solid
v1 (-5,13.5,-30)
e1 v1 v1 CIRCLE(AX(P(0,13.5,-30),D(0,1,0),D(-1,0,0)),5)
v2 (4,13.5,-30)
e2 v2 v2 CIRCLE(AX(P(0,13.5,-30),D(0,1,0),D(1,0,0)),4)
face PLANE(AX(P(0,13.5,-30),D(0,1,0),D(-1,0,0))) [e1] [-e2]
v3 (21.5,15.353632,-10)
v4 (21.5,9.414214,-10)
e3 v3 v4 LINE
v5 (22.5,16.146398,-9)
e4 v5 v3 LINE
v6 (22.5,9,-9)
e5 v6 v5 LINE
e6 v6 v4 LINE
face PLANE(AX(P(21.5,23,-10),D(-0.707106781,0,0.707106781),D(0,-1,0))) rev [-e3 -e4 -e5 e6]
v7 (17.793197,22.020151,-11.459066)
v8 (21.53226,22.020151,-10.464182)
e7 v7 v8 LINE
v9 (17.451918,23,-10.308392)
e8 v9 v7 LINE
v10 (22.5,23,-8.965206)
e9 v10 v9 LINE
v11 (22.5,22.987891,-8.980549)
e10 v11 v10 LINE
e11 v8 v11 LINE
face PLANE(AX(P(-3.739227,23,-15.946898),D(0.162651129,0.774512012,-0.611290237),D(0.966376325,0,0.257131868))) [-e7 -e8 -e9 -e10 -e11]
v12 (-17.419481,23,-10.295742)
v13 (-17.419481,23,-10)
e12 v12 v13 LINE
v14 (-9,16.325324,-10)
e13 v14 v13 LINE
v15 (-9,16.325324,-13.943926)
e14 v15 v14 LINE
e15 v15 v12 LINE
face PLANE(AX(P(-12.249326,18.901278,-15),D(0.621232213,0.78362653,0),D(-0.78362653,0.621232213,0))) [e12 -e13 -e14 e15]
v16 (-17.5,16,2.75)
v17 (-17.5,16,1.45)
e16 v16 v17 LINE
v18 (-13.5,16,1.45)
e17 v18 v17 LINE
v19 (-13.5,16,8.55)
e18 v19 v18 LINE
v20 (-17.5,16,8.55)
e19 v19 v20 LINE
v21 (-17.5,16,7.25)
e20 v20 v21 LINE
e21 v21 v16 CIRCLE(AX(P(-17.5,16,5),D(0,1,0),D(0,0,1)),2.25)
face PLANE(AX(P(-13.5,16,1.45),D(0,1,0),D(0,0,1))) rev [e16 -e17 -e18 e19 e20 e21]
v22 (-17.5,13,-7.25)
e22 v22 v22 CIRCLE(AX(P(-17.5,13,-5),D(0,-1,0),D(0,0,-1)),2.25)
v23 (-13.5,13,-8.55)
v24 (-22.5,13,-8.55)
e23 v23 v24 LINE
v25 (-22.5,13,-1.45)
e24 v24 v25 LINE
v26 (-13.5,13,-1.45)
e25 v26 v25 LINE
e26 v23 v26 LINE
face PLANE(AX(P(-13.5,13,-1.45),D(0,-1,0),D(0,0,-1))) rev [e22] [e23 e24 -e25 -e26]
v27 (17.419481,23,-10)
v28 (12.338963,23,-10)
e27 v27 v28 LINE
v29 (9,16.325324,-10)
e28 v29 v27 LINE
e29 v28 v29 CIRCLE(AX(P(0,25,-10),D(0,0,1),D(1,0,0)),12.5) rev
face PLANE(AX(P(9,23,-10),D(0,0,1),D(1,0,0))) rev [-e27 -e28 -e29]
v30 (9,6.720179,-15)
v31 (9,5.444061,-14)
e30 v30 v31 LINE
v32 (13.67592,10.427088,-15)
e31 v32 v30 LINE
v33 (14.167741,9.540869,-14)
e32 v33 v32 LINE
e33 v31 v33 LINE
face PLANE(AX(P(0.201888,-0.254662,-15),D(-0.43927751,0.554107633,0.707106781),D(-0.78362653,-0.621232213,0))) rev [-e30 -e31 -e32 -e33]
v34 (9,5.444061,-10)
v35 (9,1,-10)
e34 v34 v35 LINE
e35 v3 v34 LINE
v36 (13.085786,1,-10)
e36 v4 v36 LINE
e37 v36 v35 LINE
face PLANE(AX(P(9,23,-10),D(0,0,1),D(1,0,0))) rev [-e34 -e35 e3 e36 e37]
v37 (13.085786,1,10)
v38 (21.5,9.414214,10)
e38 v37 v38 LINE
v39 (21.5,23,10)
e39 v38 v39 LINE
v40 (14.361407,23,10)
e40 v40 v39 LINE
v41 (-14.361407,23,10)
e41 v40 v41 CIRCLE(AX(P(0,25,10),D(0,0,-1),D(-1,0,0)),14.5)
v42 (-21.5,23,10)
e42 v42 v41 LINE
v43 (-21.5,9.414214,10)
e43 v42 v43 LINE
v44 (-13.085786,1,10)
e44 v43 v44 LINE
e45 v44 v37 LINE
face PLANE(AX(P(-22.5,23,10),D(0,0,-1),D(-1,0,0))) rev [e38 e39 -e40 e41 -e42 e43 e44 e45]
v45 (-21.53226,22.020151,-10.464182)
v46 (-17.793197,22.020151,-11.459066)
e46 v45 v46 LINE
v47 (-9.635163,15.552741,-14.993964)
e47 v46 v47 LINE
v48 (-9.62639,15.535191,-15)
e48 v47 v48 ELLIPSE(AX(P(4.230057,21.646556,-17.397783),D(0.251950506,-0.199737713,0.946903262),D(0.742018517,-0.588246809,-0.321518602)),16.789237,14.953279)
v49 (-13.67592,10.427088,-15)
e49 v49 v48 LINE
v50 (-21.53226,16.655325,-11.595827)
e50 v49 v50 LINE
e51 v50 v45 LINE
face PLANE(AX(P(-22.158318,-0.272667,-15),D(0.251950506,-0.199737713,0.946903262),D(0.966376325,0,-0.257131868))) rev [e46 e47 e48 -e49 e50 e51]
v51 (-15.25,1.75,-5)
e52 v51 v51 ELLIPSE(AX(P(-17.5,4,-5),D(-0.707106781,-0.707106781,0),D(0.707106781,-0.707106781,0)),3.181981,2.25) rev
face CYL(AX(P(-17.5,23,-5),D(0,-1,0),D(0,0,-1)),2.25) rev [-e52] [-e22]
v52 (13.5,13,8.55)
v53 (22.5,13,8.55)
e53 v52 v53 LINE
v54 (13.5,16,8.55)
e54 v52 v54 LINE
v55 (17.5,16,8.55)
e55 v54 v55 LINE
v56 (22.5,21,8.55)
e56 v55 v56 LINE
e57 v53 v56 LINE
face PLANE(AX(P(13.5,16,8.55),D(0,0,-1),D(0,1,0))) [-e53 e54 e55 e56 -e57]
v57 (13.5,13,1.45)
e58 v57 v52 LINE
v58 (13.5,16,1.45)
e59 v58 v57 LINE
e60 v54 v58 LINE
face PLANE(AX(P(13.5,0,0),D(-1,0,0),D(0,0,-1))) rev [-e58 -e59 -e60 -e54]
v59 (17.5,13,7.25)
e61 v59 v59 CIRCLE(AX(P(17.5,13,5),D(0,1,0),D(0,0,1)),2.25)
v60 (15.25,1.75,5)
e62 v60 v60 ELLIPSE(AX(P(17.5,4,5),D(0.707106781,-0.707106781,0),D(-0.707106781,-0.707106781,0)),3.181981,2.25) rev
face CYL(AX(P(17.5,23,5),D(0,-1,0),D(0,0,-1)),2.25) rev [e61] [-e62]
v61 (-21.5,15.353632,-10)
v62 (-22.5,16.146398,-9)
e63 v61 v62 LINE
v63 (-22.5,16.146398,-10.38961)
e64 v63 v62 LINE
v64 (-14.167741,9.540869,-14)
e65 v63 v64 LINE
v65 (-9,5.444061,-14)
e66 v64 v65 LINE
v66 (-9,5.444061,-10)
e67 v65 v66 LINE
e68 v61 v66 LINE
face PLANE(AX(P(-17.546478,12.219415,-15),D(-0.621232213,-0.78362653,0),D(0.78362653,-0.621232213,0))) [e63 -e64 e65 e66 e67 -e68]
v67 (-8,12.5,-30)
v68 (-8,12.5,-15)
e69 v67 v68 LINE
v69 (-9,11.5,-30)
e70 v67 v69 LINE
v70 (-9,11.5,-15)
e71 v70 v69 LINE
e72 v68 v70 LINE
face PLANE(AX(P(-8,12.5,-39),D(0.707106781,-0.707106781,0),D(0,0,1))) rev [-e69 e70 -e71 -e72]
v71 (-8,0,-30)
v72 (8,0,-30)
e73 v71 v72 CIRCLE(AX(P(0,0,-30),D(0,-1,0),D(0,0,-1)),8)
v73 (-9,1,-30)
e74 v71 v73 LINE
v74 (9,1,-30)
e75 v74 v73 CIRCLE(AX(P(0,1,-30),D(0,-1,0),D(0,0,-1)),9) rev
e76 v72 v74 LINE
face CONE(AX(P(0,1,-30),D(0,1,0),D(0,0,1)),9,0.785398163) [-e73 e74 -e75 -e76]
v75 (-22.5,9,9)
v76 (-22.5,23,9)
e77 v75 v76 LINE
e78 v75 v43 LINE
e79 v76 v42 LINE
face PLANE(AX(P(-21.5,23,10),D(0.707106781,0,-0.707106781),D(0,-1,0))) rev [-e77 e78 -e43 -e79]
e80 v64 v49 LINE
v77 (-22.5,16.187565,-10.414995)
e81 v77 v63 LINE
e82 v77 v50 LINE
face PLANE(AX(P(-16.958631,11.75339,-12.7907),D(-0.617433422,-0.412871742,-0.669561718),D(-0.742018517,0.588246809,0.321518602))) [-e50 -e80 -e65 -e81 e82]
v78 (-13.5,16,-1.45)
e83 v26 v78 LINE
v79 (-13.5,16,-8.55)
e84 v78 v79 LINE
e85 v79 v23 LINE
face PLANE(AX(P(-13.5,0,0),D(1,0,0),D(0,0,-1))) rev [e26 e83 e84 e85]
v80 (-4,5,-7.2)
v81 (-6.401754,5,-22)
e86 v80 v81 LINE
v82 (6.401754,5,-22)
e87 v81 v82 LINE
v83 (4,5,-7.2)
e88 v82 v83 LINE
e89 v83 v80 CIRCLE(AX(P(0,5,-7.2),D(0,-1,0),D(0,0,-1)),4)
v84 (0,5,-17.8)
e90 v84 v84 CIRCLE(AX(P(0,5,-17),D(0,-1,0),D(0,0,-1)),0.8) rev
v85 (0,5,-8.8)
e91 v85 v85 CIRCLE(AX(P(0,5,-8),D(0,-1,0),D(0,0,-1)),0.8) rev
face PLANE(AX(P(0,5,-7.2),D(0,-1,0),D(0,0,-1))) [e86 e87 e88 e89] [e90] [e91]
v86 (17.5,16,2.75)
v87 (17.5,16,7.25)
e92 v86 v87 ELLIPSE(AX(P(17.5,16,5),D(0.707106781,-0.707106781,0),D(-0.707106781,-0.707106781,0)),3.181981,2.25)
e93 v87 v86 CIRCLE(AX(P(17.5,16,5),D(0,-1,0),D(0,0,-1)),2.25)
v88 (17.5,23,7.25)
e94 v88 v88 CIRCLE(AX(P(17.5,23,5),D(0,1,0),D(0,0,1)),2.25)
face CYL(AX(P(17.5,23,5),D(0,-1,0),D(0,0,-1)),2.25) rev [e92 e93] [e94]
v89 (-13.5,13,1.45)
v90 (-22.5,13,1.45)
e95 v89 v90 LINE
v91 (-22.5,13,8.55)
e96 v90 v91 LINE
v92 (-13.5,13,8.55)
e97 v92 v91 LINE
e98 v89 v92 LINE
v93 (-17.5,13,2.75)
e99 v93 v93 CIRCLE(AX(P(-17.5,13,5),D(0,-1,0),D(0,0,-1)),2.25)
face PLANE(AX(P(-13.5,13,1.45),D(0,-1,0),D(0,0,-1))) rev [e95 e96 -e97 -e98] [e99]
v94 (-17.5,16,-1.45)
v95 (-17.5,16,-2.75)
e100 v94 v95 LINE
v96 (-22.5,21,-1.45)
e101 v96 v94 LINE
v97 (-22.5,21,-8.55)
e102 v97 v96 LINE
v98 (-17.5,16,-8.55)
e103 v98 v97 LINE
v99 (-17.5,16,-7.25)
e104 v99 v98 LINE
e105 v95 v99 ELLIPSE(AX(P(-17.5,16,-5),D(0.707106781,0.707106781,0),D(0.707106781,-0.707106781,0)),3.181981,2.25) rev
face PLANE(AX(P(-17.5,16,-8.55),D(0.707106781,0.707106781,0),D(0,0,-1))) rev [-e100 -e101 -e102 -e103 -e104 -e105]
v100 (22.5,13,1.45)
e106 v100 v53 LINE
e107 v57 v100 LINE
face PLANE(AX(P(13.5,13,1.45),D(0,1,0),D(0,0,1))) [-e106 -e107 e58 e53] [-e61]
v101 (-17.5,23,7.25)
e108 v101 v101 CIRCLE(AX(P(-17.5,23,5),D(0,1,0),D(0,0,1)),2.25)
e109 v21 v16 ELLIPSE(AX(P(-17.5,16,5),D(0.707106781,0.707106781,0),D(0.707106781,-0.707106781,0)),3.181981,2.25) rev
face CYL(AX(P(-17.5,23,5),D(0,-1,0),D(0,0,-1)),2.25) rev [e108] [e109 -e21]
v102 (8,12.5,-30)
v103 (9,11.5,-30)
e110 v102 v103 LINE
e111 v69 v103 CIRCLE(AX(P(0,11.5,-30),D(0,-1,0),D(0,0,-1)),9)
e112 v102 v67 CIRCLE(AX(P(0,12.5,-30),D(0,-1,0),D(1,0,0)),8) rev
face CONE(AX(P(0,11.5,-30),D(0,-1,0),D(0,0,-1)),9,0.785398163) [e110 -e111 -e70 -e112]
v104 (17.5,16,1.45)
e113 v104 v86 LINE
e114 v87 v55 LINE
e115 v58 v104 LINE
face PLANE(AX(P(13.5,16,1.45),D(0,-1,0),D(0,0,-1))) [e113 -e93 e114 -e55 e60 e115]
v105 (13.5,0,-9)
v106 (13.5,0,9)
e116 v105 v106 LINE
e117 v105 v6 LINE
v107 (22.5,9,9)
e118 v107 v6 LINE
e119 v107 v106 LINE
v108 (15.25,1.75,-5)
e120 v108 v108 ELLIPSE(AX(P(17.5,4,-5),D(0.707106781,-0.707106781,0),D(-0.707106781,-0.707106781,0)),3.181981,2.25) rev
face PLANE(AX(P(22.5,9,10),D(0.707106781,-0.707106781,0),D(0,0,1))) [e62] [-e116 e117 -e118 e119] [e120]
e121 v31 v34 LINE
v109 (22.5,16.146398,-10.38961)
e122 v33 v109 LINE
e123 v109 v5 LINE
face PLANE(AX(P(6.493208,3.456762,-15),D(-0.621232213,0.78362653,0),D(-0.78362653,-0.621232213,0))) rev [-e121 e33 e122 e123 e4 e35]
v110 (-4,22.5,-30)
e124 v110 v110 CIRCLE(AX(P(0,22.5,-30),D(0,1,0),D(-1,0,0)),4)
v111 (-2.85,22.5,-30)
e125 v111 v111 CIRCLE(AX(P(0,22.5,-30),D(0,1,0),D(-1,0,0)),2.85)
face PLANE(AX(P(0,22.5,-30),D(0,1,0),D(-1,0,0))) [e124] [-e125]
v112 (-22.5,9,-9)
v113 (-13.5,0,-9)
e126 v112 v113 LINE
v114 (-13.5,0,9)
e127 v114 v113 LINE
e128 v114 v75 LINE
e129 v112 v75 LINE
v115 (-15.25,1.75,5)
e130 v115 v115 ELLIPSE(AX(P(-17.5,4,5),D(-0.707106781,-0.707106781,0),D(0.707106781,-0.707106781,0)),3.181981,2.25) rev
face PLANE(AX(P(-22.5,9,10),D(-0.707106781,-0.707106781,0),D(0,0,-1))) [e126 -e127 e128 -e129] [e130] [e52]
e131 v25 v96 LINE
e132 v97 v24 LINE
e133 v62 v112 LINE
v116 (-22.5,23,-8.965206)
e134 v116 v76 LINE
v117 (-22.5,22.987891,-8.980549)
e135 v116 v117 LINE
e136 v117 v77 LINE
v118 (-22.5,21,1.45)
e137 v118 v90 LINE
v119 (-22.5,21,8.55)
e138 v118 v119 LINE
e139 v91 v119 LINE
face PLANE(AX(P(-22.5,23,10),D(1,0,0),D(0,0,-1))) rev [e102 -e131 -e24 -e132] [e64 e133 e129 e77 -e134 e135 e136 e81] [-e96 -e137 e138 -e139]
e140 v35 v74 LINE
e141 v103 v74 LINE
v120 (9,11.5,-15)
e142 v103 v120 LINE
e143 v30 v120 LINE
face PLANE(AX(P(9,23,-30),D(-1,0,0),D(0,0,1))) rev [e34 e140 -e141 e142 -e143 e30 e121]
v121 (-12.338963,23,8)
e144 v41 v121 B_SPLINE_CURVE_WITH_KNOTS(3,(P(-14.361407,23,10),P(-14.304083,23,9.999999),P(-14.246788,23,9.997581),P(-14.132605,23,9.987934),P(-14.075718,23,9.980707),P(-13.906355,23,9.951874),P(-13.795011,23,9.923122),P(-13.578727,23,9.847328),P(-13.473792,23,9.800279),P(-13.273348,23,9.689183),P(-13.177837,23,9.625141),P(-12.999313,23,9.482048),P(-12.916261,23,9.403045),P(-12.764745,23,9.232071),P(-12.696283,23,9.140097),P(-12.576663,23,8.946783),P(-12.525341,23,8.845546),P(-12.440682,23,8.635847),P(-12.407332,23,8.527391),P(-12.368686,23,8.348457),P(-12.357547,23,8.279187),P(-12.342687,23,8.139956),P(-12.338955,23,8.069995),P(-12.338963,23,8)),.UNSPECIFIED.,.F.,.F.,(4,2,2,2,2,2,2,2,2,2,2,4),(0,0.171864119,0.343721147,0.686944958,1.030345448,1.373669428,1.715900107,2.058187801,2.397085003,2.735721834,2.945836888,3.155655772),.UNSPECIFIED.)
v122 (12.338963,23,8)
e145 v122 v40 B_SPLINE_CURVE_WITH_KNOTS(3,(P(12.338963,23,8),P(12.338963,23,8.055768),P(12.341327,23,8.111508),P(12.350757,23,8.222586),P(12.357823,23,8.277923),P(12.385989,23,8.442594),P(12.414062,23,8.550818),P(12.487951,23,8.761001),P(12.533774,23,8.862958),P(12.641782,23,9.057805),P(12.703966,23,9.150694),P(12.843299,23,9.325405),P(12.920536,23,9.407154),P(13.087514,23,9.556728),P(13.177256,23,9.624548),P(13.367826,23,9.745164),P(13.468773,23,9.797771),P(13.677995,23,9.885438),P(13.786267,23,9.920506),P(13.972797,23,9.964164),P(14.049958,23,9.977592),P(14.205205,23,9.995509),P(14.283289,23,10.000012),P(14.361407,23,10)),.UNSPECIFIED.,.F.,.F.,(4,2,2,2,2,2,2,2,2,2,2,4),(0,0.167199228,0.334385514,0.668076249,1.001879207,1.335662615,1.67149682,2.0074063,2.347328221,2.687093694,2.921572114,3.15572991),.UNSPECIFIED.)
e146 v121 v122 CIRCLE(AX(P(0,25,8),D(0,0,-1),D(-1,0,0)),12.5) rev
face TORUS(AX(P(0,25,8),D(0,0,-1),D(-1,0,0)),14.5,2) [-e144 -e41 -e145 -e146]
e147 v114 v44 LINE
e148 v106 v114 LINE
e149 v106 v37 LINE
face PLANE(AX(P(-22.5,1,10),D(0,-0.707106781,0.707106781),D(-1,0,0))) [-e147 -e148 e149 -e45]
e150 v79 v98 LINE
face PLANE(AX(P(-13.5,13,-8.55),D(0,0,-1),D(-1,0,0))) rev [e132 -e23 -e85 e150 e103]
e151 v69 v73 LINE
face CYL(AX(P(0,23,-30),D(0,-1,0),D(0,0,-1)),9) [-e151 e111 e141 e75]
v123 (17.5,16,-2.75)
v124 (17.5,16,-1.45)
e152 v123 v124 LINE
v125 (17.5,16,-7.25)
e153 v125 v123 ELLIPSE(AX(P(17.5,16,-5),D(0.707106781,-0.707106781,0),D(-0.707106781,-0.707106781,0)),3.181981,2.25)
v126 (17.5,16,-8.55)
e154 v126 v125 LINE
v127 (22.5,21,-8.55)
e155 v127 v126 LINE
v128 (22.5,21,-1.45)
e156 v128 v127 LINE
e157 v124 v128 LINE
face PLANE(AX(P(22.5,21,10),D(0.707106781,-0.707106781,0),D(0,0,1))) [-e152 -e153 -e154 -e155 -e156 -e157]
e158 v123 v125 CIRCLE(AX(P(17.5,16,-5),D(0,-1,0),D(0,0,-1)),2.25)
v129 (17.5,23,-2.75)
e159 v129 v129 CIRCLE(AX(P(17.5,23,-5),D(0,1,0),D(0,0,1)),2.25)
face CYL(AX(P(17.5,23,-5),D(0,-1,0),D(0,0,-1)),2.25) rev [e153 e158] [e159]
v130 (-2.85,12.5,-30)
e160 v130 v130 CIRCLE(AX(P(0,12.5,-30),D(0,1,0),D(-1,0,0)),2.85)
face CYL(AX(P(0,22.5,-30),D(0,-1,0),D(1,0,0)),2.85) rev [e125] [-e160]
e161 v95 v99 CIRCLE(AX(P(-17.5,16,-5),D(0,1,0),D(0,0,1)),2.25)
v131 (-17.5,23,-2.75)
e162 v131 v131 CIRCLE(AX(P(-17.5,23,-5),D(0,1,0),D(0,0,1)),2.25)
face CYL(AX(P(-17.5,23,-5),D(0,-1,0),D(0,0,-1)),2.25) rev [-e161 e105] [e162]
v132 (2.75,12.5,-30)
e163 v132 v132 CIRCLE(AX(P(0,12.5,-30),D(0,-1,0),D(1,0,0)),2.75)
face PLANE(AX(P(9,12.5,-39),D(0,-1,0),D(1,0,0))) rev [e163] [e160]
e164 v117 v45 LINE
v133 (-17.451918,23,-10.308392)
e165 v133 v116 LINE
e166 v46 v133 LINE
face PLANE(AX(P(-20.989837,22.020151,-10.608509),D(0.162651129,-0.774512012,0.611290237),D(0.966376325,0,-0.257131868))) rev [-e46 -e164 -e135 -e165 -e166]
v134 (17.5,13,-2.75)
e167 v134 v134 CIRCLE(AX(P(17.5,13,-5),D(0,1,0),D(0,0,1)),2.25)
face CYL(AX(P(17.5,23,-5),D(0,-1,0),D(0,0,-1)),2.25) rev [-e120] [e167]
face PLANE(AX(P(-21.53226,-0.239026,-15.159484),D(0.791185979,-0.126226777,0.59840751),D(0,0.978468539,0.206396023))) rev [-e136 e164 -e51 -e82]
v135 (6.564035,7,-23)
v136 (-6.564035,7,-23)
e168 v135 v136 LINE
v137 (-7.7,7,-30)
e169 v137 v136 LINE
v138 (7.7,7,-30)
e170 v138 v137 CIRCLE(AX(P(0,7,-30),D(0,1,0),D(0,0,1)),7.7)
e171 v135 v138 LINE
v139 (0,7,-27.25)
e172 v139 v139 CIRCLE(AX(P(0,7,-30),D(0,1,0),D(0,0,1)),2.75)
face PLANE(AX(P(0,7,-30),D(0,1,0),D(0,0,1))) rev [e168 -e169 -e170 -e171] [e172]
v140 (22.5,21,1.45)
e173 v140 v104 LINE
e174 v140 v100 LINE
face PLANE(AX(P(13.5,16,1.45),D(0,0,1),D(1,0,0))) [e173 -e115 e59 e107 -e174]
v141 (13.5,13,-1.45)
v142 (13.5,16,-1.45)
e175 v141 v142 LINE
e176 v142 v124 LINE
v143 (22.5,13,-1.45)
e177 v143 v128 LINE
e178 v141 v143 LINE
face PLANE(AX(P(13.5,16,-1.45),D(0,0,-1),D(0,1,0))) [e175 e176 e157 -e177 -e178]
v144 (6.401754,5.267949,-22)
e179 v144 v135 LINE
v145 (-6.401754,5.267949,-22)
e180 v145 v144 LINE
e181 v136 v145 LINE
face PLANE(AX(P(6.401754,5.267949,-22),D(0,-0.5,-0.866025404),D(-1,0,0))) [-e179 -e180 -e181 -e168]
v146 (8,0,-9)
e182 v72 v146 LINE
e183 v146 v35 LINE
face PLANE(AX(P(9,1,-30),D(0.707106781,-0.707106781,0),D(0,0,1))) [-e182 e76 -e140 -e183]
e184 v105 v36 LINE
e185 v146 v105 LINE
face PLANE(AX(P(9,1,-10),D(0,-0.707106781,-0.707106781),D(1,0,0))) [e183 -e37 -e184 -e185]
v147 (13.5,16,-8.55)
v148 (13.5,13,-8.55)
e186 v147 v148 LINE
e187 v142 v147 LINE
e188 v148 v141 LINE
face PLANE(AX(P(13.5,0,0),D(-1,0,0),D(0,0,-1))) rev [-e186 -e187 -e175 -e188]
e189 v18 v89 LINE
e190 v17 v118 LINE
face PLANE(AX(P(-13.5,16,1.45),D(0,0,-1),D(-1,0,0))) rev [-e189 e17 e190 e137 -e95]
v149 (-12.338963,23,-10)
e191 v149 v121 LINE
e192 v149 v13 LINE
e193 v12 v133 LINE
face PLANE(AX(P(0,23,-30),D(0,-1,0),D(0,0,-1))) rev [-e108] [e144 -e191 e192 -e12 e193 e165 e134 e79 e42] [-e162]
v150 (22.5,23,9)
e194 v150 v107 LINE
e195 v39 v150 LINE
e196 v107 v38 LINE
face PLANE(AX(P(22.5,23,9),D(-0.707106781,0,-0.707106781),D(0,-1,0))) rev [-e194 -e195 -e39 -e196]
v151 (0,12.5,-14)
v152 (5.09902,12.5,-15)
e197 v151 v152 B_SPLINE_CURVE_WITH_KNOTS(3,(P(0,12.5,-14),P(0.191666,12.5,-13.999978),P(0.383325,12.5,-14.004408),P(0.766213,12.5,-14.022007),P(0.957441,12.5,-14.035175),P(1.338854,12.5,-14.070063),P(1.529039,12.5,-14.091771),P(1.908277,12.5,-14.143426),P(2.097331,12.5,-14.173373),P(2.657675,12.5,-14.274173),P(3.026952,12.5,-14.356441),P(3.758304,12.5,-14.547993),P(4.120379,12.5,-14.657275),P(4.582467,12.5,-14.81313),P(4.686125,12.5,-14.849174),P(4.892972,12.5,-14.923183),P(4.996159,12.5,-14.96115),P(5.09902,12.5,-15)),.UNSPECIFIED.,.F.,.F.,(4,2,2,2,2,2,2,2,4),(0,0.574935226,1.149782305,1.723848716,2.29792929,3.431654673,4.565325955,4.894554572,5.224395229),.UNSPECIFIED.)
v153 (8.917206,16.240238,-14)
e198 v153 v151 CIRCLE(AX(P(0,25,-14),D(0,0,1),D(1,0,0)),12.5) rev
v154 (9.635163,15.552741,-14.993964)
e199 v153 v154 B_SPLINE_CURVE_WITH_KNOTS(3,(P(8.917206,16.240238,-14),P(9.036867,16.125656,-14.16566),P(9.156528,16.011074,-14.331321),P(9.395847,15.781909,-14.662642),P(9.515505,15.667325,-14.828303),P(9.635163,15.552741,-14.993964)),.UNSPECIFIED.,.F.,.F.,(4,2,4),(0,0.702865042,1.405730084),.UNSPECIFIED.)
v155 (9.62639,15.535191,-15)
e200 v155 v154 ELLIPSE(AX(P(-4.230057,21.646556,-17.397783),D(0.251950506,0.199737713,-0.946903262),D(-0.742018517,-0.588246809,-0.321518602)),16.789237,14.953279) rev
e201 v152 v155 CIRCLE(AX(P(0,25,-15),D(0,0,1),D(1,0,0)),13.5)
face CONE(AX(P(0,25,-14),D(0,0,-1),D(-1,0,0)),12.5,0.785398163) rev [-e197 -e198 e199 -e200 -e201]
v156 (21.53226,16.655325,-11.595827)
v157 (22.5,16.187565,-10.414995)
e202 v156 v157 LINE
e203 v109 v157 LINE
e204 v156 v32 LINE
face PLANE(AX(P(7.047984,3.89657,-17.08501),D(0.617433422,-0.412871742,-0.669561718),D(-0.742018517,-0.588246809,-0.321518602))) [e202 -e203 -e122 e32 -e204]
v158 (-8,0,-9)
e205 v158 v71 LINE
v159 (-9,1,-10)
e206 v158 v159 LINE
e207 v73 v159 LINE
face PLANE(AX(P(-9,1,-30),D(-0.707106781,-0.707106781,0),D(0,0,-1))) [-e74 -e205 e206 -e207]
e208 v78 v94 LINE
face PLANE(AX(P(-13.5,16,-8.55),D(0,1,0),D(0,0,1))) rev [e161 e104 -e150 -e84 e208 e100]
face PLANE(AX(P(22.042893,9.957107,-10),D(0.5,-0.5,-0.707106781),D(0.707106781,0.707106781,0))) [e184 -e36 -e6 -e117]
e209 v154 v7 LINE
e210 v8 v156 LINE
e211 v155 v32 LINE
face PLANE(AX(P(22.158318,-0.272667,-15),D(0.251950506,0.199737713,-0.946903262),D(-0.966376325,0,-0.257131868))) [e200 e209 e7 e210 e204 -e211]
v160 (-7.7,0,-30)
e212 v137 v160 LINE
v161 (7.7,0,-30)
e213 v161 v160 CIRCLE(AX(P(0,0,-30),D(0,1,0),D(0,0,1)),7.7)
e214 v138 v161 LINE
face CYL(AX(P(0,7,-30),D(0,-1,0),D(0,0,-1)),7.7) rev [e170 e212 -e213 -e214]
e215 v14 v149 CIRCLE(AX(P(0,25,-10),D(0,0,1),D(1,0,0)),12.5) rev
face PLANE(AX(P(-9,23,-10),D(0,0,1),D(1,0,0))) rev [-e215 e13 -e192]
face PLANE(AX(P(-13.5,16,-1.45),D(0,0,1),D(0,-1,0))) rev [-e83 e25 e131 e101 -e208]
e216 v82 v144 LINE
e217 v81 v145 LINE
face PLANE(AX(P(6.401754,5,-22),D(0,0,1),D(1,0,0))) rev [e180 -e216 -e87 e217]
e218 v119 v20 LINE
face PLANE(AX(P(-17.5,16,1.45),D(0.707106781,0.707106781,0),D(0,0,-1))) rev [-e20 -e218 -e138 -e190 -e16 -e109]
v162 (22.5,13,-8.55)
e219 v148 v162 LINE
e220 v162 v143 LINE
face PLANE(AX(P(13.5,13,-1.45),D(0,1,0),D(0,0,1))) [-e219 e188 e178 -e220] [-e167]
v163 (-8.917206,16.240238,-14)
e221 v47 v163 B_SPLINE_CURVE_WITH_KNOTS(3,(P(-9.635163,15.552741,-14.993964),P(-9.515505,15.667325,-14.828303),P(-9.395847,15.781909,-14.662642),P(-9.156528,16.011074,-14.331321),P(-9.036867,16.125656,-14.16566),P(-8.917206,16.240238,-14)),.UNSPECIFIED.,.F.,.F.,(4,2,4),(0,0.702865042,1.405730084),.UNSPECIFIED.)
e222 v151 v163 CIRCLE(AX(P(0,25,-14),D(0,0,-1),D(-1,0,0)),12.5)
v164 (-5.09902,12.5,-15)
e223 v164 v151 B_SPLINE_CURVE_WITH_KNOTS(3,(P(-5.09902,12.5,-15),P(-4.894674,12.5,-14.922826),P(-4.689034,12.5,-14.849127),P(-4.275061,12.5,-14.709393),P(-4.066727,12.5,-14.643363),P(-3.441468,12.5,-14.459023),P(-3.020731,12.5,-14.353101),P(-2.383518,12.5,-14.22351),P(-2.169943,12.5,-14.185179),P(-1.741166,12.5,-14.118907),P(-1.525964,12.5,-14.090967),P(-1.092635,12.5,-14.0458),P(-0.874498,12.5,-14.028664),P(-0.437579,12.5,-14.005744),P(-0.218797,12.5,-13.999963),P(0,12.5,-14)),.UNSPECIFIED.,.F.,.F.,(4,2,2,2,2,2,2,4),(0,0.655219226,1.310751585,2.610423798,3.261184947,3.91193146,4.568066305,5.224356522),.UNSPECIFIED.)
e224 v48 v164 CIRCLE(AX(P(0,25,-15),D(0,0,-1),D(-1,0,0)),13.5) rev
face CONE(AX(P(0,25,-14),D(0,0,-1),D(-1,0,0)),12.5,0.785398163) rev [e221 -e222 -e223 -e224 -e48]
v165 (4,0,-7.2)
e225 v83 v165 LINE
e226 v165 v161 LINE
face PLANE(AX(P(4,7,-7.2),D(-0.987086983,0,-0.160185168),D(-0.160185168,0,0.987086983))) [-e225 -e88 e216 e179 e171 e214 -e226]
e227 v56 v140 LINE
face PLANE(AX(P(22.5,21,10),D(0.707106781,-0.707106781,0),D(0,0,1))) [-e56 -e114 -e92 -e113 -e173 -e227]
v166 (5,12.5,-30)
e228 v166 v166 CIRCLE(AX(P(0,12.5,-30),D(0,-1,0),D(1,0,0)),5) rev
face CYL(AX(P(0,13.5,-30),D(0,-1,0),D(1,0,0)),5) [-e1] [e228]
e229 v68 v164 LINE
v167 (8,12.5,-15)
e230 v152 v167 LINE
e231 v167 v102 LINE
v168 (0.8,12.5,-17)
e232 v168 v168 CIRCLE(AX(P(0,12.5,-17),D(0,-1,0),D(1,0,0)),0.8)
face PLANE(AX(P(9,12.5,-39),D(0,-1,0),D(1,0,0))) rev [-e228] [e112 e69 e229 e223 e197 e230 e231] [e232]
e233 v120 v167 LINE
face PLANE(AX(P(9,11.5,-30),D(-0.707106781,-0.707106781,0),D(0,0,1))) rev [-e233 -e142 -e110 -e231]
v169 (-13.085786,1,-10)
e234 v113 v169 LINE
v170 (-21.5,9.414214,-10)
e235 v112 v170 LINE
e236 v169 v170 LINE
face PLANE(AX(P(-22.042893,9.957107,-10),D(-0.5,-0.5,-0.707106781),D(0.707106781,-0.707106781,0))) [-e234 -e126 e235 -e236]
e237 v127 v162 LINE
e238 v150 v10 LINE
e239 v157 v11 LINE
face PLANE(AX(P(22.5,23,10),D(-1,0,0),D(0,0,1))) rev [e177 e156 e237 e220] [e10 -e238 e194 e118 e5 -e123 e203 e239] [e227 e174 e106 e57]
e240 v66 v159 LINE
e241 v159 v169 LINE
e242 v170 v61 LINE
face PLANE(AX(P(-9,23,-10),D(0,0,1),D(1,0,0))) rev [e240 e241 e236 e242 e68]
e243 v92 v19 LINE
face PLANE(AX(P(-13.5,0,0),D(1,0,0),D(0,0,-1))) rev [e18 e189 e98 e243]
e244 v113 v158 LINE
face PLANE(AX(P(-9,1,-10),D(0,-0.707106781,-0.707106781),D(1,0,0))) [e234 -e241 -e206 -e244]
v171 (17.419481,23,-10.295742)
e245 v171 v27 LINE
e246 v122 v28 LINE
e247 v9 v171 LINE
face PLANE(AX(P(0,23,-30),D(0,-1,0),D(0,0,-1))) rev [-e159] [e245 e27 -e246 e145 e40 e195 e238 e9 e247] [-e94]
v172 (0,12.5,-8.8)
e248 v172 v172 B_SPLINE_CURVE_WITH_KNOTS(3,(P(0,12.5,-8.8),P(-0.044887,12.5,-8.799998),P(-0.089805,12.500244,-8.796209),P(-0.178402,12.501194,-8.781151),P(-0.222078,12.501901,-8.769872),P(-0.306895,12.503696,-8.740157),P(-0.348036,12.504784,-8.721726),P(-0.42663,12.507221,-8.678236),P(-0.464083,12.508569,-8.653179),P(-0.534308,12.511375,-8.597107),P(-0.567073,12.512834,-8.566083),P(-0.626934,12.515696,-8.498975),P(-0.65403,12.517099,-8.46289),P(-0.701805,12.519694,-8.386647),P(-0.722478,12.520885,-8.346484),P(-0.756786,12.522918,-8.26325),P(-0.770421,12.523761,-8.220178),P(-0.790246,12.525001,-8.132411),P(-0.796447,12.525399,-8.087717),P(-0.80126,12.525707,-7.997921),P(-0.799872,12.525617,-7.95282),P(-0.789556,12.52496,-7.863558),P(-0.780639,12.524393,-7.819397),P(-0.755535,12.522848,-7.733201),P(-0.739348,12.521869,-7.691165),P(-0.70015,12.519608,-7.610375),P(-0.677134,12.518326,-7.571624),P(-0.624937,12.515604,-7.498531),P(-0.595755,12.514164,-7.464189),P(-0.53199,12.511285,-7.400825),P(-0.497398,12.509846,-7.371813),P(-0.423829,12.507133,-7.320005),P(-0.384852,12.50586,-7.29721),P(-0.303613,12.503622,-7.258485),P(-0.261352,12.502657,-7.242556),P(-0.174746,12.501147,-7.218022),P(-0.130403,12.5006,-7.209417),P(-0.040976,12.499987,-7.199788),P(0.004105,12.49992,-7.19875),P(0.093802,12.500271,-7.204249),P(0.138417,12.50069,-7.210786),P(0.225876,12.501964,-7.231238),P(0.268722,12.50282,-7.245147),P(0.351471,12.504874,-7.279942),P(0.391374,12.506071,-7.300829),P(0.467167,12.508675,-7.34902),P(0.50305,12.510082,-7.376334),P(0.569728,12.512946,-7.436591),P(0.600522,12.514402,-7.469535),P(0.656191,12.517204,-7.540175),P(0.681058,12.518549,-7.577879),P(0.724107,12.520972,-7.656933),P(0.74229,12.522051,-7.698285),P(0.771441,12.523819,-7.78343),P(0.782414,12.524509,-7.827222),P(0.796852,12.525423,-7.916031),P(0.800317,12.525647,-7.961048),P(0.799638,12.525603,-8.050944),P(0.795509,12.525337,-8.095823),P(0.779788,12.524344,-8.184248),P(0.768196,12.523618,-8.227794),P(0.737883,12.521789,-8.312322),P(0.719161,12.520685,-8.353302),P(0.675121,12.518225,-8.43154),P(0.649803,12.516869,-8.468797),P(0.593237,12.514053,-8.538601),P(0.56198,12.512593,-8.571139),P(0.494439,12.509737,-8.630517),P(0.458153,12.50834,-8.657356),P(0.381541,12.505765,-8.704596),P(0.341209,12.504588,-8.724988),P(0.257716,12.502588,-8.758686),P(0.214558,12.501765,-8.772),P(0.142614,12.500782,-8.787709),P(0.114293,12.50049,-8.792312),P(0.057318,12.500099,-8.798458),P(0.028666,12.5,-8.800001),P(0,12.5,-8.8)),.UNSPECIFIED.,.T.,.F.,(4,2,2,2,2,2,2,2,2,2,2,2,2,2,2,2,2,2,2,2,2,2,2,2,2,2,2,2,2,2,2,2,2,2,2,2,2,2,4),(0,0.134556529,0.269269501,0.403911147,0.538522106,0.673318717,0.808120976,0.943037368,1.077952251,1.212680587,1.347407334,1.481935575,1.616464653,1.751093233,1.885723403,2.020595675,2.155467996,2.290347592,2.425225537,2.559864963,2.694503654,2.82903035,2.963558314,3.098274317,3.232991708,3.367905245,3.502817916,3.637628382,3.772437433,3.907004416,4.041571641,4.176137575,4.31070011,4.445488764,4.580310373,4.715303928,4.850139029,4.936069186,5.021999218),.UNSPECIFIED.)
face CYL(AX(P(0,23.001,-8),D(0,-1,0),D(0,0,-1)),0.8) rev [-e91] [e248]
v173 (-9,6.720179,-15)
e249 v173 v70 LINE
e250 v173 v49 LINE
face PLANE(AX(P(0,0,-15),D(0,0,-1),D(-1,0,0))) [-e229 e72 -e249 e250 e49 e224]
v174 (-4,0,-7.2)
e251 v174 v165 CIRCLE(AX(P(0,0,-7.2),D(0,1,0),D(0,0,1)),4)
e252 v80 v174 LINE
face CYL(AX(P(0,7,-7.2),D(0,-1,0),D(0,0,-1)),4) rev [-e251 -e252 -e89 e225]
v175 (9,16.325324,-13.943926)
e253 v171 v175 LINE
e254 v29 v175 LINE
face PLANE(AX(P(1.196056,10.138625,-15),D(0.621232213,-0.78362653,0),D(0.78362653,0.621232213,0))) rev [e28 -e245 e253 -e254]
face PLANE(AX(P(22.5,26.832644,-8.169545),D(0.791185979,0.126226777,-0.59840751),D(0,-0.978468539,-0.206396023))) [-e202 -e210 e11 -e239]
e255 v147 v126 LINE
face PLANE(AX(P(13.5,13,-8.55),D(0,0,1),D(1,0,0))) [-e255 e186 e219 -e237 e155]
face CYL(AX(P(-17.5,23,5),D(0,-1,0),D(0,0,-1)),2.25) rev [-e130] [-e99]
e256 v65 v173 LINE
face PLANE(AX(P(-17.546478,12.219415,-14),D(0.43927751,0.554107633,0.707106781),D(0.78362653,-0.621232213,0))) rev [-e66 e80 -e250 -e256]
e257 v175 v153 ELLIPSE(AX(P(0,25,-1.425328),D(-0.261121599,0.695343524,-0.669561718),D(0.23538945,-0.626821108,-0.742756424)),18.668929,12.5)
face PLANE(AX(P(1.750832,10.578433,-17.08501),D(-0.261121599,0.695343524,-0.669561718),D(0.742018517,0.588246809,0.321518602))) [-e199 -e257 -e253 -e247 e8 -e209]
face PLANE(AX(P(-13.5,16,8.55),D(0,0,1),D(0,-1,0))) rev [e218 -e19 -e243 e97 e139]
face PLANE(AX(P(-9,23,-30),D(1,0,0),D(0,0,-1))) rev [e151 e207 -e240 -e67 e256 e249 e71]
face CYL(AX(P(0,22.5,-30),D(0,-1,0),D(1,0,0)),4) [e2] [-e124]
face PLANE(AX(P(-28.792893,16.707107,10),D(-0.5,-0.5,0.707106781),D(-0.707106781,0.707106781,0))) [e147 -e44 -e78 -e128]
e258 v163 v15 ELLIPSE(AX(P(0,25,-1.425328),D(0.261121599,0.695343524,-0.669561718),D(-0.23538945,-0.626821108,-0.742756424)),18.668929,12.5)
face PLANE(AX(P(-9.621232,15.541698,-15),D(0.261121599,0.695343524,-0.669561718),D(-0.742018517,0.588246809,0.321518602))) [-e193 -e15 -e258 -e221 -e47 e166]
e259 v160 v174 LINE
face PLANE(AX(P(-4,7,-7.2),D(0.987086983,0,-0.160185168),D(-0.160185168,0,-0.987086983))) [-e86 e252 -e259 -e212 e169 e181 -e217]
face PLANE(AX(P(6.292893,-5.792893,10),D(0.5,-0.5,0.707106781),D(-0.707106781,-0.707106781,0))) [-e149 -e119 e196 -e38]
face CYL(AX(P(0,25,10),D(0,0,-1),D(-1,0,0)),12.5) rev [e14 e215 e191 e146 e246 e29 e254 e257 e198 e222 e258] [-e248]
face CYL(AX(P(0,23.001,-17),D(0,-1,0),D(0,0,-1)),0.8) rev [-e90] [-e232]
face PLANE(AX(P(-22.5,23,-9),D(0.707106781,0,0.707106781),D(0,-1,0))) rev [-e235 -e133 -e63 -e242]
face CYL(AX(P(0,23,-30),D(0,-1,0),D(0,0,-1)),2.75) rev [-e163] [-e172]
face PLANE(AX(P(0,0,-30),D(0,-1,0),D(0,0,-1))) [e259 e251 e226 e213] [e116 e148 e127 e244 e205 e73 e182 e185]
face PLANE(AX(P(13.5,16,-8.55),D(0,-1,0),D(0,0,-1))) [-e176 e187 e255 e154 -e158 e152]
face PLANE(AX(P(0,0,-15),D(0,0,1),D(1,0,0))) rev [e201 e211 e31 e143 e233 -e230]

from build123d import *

# Parameters (mm, degrees)
SKETCH1_R               = 2.25
SKETCH1_R_2             = 2.75
BOSS_EXTRUDE1_DEPTH     = 23
CUT_EXTRUDE1_DEPTH      = 10
CUT_EXTRUDE1_DEPTH_BACK = 51.55937104
SKETCH2_R               = 12.5
BOSS_EXTRUDE2_START     = -22.5
BOSS_EXTRUDE2_DEPTH     = 5
CUT_EXTRUDE8_REACH      = 52.496
FILLET1_R               = 2
CHAMFER1_SIZE           = 9
CHAMFER2_SIZE           = 1
SKETCH5_R               = 3.35
CUT_EXTRUDE10_DEPTH     = 4
CUT_EXTRUDE11_START     = -15
SKETCH6_W               = 18
SKETCH6_H               = 3.825324214
CUT_EXTRUDE11_DEPTH     = 36.559371208
CHAMFER3_SIZE           = 1
CHAMFER4_SIZE           = 1
CHAMFER5_SIZE           = 1
CHAMFER6_SIZE           = 1
SKETCH7_R               = 4
SKETCH7_R_2             = 2.85
BOSS_EXTRUDE3_DEPTH     = 10
SKETCH8_R               = 5
SKETCH8_R_2             = 4
EXTRUDE_THIN1_DEPTH     = 1
SKETCH10_R              = 0.3
BOSS_EXTRUDE4_DEPTH     = 4
BOSS_EXTRUDE5_START     = 4
SKETCH11_R              = 2.5
SKETCH11_R_2            = 1.6
BOSS_EXTRUDE5_DEPTH     = 2
SKETCH12_W              = 7.1
SKETCH12_H              = 3
CUT_EXTRUDE12_DEPTH     = 9
CHAMFER7_SIZE           = 5
SKETCH13_R              = 1.6
SKETCH13_R_2            = 0.8
CUT_EXTRUDE13_DEPTH     = 7
BOSS_EXTRUDE6_START     = 2
BOSS_EXTRUDE6_DEPTH     = 2
CUT_EXTRUDE14_REACH     = 52.559
SKETCH13_2_R            = 0.8
CHAMFER8_SIZE           = 1
CHAMFER8_SIZE2          = 1.732050808


with BuildPart() as part:
    # Sketch1 → Boss-Extrude1 (new body)
    with BuildSketch(Plane(origin=(0, 0, 0), x_dir=(1, 0, 0), z_dir=(0, 1, 0))):
        with BuildLine():
            Line((-22.5, -10), (-22.5, 10))
            Line((-22.5, 10), (-9, 10))
            Line((-9, 10), (-9, 30))
            ThreePointArc((-9, 30), (0, 39), (9, 30))
            Line((9, 30), (9, 10))
            Line((9, 10), (22.5, 10))
            Line((22.5, 10), (22.5, -10))
            Line((22.5, -10), (-22.5, -10))
        make_face()
        with Locations(Location((-17.5, 5, 0), (0, 0, 270))):
            Circle(SKETCH1_R, mode=Mode.SUBTRACT)
        with Locations(Location((-17.5, -5, 0), (0, 0, 270))):
            Circle(SKETCH1_R, mode=Mode.SUBTRACT)
        with Locations(Location((17.5, 5, 0), (0, 0, 270))):
            Circle(SKETCH1_R, mode=Mode.SUBTRACT)
        with Locations(Location((17.5, -5, 0), (0, 0, 270))):
            Circle(SKETCH1_R, mode=Mode.SUBTRACT)
        with Locations(Location((0, 30, 0), (0, 0, 270))):
            Circle(SKETCH1_R_2, mode=Mode.SUBTRACT)
    extrude(amount=BOSS_EXTRUDE1_DEPTH)

    # Sketch2 → Cut-Extrude1 (cut, two sides: drawn at the far end of the back side and taken through both)
    with BuildSketch(Plane.XY.offset(-CUT_EXTRUDE1_DEPTH_BACK)):
        with Locations((0, 25)):
            Circle(SKETCH2_R)
    extrude(amount=CUT_EXTRUDE1_DEPTH + CUT_EXTRUDE1_DEPTH_BACK, mode=Mode.SUBTRACT)

    # Sketch3 → Boss-Extrude2 (add)
    with BuildSketch(Plane(origin=(0, 0, -32.5), x_dir=(-1, 0, 0), z_dir=(0, 0, -1)).offset(BOSS_EXTRUDE2_START)):
        Polygon((9, 16.325324214), (17.41948134, 23), (22.5, 23), (22.5, 16.146397564), (9, 5.444060985), align=None)
    boss_extrude2 = extrude(amount=BOSS_EXTRUDE2_DEPTH)

    # Mirror1: Boss-Extrude2 across plane
    add(boss_extrude2.mirror(Plane(origin=(0, 0, 0), x_dir=(0, 0, 1), z_dir=(1, 0, 0))))

    # Sketch4 → Cut-Extrude8 (cut, up to next)
    with BuildSketch(Plane(origin=(4.474031923, 5.643574234, 0), x_dir=(0.7836265295847679, -0.6212322127280048, 0), z_dir=(0.6212322127280048, 0.7836265295847679, 0)), mode=Mode.PRIVATE) as cut_extrude8_sk1:
        Polygon((-17.194456051, 15), (-31.919937808, 10), (-31.919937808, 15.796390808), (-17.194456051, 15.796390808), align=None)
    cut_extrude8_tool1 = extrude(cut_extrude8_sk1.sketch, amount=-CUT_EXTRUDE8_REACH, mode=Mode.PRIVATE) & part.part
    cut_extrude8 = cut_extrude8_tool1.solids().sort_by_distance((-16.228214, 22.055604, -13.832193))[0]
    add(cut_extrude8, mode=Mode.SUBTRACT)

    # Mirror2: Cut-Extrude8 across plane
    add(cut_extrude8.mirror(Plane(origin=(0, 0, 0), x_dir=(0, 0, 1), z_dir=(1, 0, 0))), mode=Mode.SUBTRACT)

    # Fillet1
    fillet1_edges = [part.edges().sort_by_distance(p)[0] for p in [
        (0, 12.5, 10),
    ]]
    fillet(fillet1_edges, radius=FILLET1_R)

    # Chamfer1
    # the kernel refuses this chamfer: 9 mm, written as the material it takes off along each edge
    with BuildSketch(Plane(origin=(22.5, 0, -33.145146892), x_dir=(-0.9996219169112966, -0.027495876610586365, 0), z_dir=(0, 0, 1))) as chamfer1_piece_1:
        Polygon((CHAMFER1_SIZE * 0.999621916911, -CHAMFER1_SIZE * 0.0274958766106), (-CHAMFER1_SIZE * 0.0274958766106, -CHAMFER1_SIZE * 0.999621916911), (0, 0), align=None)
    extrude(amount=66.290293783, mode=Mode.SUBTRACT)
    with BuildSketch(Plane(origin=(-22.5, 0, 33.145146892), x_dir=(-0.02749587661058639, 0.9996219169112966, 0), z_dir=(0, 0, -1))) as chamfer1_piece_2:
        Polygon((CHAMFER1_SIZE * 0.999621916911, CHAMFER1_SIZE * 0.0274958766106), (-CHAMFER1_SIZE * 0.0274958766106, CHAMFER1_SIZE * 0.999621916911), (0, 0), align=None)
    extrude(amount=66.290293783, mode=Mode.SUBTRACT)

    # Chamfer2
    chamfer2_edges = [part.edges().sort_by_distance(p)[0] for p in [
        (-11.25, 0, -10),
        (11.25, 0, -10),
        (18, 4.5, -10),
        (0, 0, 10),
        (-18, 4.5, 10),
        (18, 4.5, 10),
        (-18, 4.5, -10),
        (22.5, 16, 10),
        (-22.5, 16, 10),
        (-22.5, 12.573198782, -10),
        (22.5, 12.573198782, -10),
        (-9, 0, -20),
        (0, 0, -39),
        (9, 0, -20),
    ]]
    chamfer(chamfer2_edges, length=CHAMFER2_SIZE)

    # Sketch5 → Cut-Extrude10 (cut)
    with BuildSketch(Plane(origin=(0, 0, 0), x_dir=(1, 0, 0), z_dir=(0, 1, 0))):
        with Locations(Location((0, 30, 0), (0, 0, 270))):
            Circle(SKETCH5_R)
    extrude(amount=CUT_EXTRUDE10_DEPTH, mode=Mode.SUBTRACT)

    # Sketch6 → Cut-Extrude11 (cut, through all)
    with BuildSketch(Plane.XY.offset(CUT_EXTRUDE11_START)):
        with Locations((0, 14.412662107)):
            Rectangle(SKETCH6_W, SKETCH6_H)
    extrude(amount=-CUT_EXTRUDE11_DEPTH, mode=Mode.SUBTRACT)

    # Chamfer3
    chamfer3_edges = [part.edges().sort_by_distance(p)[0] for p in [
        (0, 12.5, -39),
        (9, 12.5, -22.5),
        (-9, 12.5, -22.5),
    ]]
    chamfer(chamfer3_edges, length=CHAMFER3_SIZE)

    # Chamfer4
    # the kernel refuses this chamfer: 1 mm, written as the material it takes off along each edge
    with BuildSketch(Plane(origin=(0, 25, -15), x_dir=(0, -1, 0), z_dir=(1, 0, 0))) as chamfer4_piece_1_section:
        Polygon((12.5 + CHAMFER4_SIZE, 0), (12.5, -CHAMFER4_SIZE), (12.5, 0), align=None)
    chamfer4_piece_1 = revolve(axis=Axis((0, 25, -15), (0, 0, -1)), revolution_arc=57.843446633, mode=Mode.PRIVATE)
    chamfer4_piece_1 = split(chamfer4_piece_1, bisect_by=Plane(origin=(-3.818564671, 12.5, -14.588370219), z_dir=(0, 1, 0)), keep=Keep.TOP, mode=Mode.PRIVATE)
    add(chamfer4_piece_1, mode=Mode.SUBTRACT)
    with BuildSketch(Plane(origin=(0, 25, -15), x_dir=(0.8465969958559083, -0.5322344658209869, 0), z_dir=(0.5322344658209869, 0.8465969958559083, 0))) as chamfer4_piece_2_section:
        Polygon((12.5, -CHAMFER4_SIZE), (12.5 + CHAMFER4_SIZE, 0), (12.5, 0), align=None)
    chamfer4_piece_2 = revolve(axis=Axis((0, 25, -15), (0, 0, -1)), revolution_arc=57.843446633, mode=Mode.PRIVATE)
    chamfer4_piece_2 = split(chamfer4_piece_2, bisect_by=Plane(origin=(7.537884287, 12.5, -14.673877281), z_dir=(0, 1, 0)), keep=Keep.TOP, mode=Mode.PRIVATE)
    add(chamfer4_piece_2, mode=Mode.SUBTRACT)

    # Chamfer5
    chamfer5_edges = [part.edges().sort_by_distance(p)[0] for p in [
        (-11.648575872, 7.543761018, -15),
        (-18.398575872, 12.894929307, -13.222841989),
        (-13.931019885, 20.234467509, -12.863375935),
        (18.398575872, 12.894929307, -13.222841989),
        (11.648575872, 7.543761018, -15),
        (13.931019885, 20.234467509, -12.863375935),
    ]]
    chamfer(chamfer5_edges, length=CHAMFER5_SIZE)

    # Chamfer6
    chamfer6_edges = [part.edges().sort_by_distance(p)[0] for p in [
        (20.764592688, 23, -10.461754404),
        (-22.5, 20.211257833, -10.588251201),
        (22.5, 20.211257833, -10.588251201),
        (-20.764592688, 23, -10.461754404),
    ]]
    chamfer(chamfer6_edges, length=CHAMFER6_SIZE)

    # Sketch7 → Boss-Extrude3 (add)
    with BuildSketch(Plane(origin=(0, 12.5, 0), x_dir=(1, 0, 0), z_dir=(0, 1, 0))):
        with Locations((0, 30)):
            Circle(SKETCH7_R)
        with Locations(Location((0, 30, 0), (0, 0, 180))):
            Circle(SKETCH7_R_2, mode=Mode.SUBTRACT)
    extrude(amount=BOSS_EXTRUDE3_DEPTH)

    # Sketch8 → Extrude-Thin1 (add)
    with BuildSketch(Plane(origin=(0, 12.5, 0), x_dir=(1, 0, 0), z_dir=(0, 1, 0))):
        with Locations((0, 30)):
            Circle(SKETCH8_R)
        with Locations((0, 30)):
            Circle(SKETCH8_R_2, mode=Mode.SUBTRACT)
    extrude(amount=EXTRUDE_THIN1_DEPTH)

    # Sketch10 → Boss-Extrude4 (add)
    with BuildSketch(Plane(origin=(0, 0, 0), x_dir=(1, 0, 0), z_dir=(0, 1, 0))):
        with Locations((0.219852061, 26.8)):
            Circle(SKETCH10_R)
        with Locations((-0.582862634, 26.8458589)):
            Circle(SKETCH10_R)
        with Locations((-1.348953927, 27.089904086)):
            Circle(SKETCH10_R)
        with Locations((-2.030285484, 27.5168013)):
            Circle(SKETCH10_R)
        with Locations((-2.584046736, 28.099727021)):
            Circle(SKETCH10_R)
        with Locations((-2.975442829, 28.802053882)):
            Circle(SKETCH10_R)
        with Locations((-3.179880906, 29.579652104)):
            Circle(SKETCH10_R)
        with Locations((-3.184515371, 30.38366233)):
            Circle(SKETCH10_R)
        with Locations((-2.989055023, 31.16356564)):
            Circle(SKETCH10_R)
        with Locations((-2.605781355, 31.870357842)):
            Circle(SKETCH10_R)
        with Locations((-2.058776861, 32.459628583)):
            Circle(SKETCH10_R)
        with Locations((-1.382411846, 32.894351813)):
            Circle(SKETCH10_R)
        with Locations((-0.61918481, 33.147212274)):
            Circle(SKETCH10_R)
        with Locations((0.182947885, 33.202321814)):
            Circle(SKETCH10_R)
        with Locations((0.973585292, 33.056217697)):
            Circle(SKETCH10_R)
        with Locations((1.703048753, 32.718080181)):
            Circle(SKETCH10_R)
        with Locations((2.325503399, 32.209155692)):
            Circle(SKETCH10_R)
        with Locations((2.801838113, 31.561421826)):
            Circle(SKETCH10_R)
        with Locations((3.102123034, 30.815578084)):
            Circle(SKETCH10_R)
        with Locations((3.207490156, 30.018488571)):
            Circle(SKETCH10_R)
        with Locations((3.111318875, 29.220237354)):
            Circle(SKETCH10_R)
        with Locations((2.819651987, 28.470981491)):
            Circle(SKETCH10_R)
        with Locations((2.350815994, 27.817799485)):
            Circle(SKETCH10_R)
        with Locations((1.734269587, 27.301733162)):
            Circle(SKETCH10_R)
        with Locations((1.008752644, 26.955208869)):
            Circle(SKETCH10_R)
    extrude(amount=BOSS_EXTRUDE4_DEPTH)

    # Sketch12 → Cut-Extrude12 (cut)
    with BuildSketch(Plane.ZY.offset(22.5)):
        with Locations((5, 14.5)):
            Rectangle(SKETCH12_W, SKETCH12_H)
        with Locations((-5, 14.5)):
            Rectangle(SKETCH12_W, SKETCH12_H)
    cut_extrude12 = extrude(amount=-CUT_EXTRUDE12_DEPTH, mode=Mode.SUBTRACT)

    # Mirror3: Cut-Extrude12 across plane
    add(cut_extrude12.mirror(Plane(origin=(0, 0, 0), x_dir=(0, 0, 1), z_dir=(1, 0, 0))), mode=Mode.SUBTRACT)

    # Chamfer7
    # the kernel refuses this chamfer: 5 mm, written as the material it takes off along each edge
    with BuildSketch(Plane(origin=(-22.5, 16, 8.55), x_dir=(-0.027495876610586317, 0.9996219169112968, 0), z_dir=(0, 0, -1)), Plane(origin=(22.5, 16, -8.55), x_dir=(0.027495876610586317, 0.9996219169112968, 0), z_dir=(0, 0, 1))) as chamfer7_piece_1:
        Polygon((CHAMFER7_SIZE * 0.999621916911, CHAMFER7_SIZE * 0.0274958766106), (-CHAMFER7_SIZE * 0.0274958766106, CHAMFER7_SIZE * 0.999621916911), (0, 0), align=None)
    extrude(amount=7.1, mode=Mode.SUBTRACT)
    with BuildSketch(Plane(origin=(-22.5, 16, 21.40841494), x_dir=(-0.027495876610586317, 0.9996219169112968, 0), z_dir=(0, 0, -1))) as chamfer7_piece_2_section:
        Polygon((CHAMFER7_SIZE * 0.999621916911, CHAMFER7_SIZE * 0.0274958766106), (-CHAMFER7_SIZE * 0.0274958766106, CHAMFER7_SIZE * 0.999621916911), (0, 0), align=None)
    chamfer7_piece_2 = extrude(amount=32.81682988, mode=Mode.PRIVATE)
    chamfer7_piece_2 = split(chamfer7_piece_2, bisect_by=Plane(origin=(-21.019540494, 17.762635971, -8.55), z_dir=(0, 0, 1)), keep=Keep.TOP, mode=Mode.PRIVATE)
    chamfer7_piece_2 = split(chamfer7_piece_2, bisect_by=Plane(origin=(-21.019540494, 17.762635971, -1.45), z_dir=(0, 0, -1)), keep=Keep.TOP, mode=Mode.PRIVATE)
    add(chamfer7_piece_2, mode=Mode.SUBTRACT)
    with BuildSketch(Plane(origin=(-22.5, 16, -8.55), x_dir=(-0.027495876610586317, 0.9996219169112968, 0), z_dir=(0, 0, 1)), Plane(origin=(22.5, 16, 8.55), x_dir=(0.027495876610586317, 0.9996219169112968, 0), z_dir=(0, 0, -1))) as chamfer7_piece_3:
        Polygon((CHAMFER7_SIZE * 0.999621916911, -CHAMFER7_SIZE * 0.0274958766106), (-CHAMFER7_SIZE * 0.0274958766106, -CHAMFER7_SIZE * 0.999621916911), (0, 0), align=None)
    extrude(amount=7.1, mode=Mode.SUBTRACT)
    with BuildSketch(Plane(origin=(-22.5, 16, -21.40841494), x_dir=(-0.027495876610586317, 0.9996219169112968, 0), z_dir=(0, 0, 1))) as chamfer7_piece_4_section:
        Polygon((CHAMFER7_SIZE * 0.999621916911, -CHAMFER7_SIZE * 0.0274958766106), (-CHAMFER7_SIZE * 0.0274958766106, -CHAMFER7_SIZE * 0.999621916911), (0, 0), align=None)
    chamfer7_piece_4 = extrude(amount=32.81682988, mode=Mode.PRIVATE)
    chamfer7_piece_4 = split(chamfer7_piece_4, bisect_by=Plane(origin=(-21.019540494, 17.762635971, 1.45), z_dir=(0, 0, 1)), keep=Keep.TOP, mode=Mode.PRIVATE)
    chamfer7_piece_4 = split(chamfer7_piece_4, bisect_by=Plane(origin=(-21.019540494, 17.762635971, 8.55), z_dir=(0, 0, -1)), keep=Keep.TOP, mode=Mode.PRIVATE)
    add(chamfer7_piece_4, mode=Mode.SUBTRACT)
    with BuildSketch(Plane(origin=(22.5, 16, 21.40841494), x_dir=(0.027495876610586317, 0.9996219169112968, 0), z_dir=(0, 0, -1))) as chamfer7_piece_5_section:
        Polygon((CHAMFER7_SIZE * 0.999621916911, -CHAMFER7_SIZE * 0.0274958766106), (-CHAMFER7_SIZE * 0.0274958766106, -CHAMFER7_SIZE * 0.999621916911), (0, 0), align=None)
    chamfer7_piece_5 = extrude(amount=32.81682988, mode=Mode.PRIVATE)
    chamfer7_piece_5 = split(chamfer7_piece_5, bisect_by=Plane(origin=(21.019540494, 17.762635972, -1.45), z_dir=(0, 0, -1)), keep=Keep.TOP, mode=Mode.PRIVATE)
    chamfer7_piece_5 = split(chamfer7_piece_5, bisect_by=Plane(origin=(21.019540494, 17.762635972, -8.55), z_dir=(0, 0, 1)), keep=Keep.TOP, mode=Mode.PRIVATE)
    add(chamfer7_piece_5, mode=Mode.SUBTRACT)
    with BuildSketch(Plane(origin=(22.5, 16, -21.40841494), x_dir=(0.027495876610586317, 0.9996219169112968, 0), z_dir=(0, 0, 1))) as chamfer7_piece_6_section:
        Polygon((CHAMFER7_SIZE * 0.999621916911, CHAMFER7_SIZE * 0.0274958766106), (-CHAMFER7_SIZE * 0.0274958766106, CHAMFER7_SIZE * 0.999621916911), (0, 0), align=None)
    chamfer7_piece_6 = extrude(amount=32.81682988, mode=Mode.PRIVATE)
    chamfer7_piece_6 = split(chamfer7_piece_6, bisect_by=Plane(origin=(21.019540494, 17.762635972, 8.55), z_dir=(0, 0, -1)), keep=Keep.TOP, mode=Mode.PRIVATE)
    chamfer7_piece_6 = split(chamfer7_piece_6, bisect_by=Plane(origin=(21.019540494, 17.762635972, 1.45), z_dir=(0, 0, 1)), keep=Keep.TOP, mode=Mode.PRIVATE)
    add(chamfer7_piece_6, mode=Mode.SUBTRACT)


with BuildPart() as body_2:
    # Sketch11 → Boss-Extrude5 (new body)
    with BuildSketch(Plane(origin=(0, 0, 0), x_dir=(1, 0, 0), z_dir=(0, 1, 0)).offset(BOSS_EXTRUDE5_START)):
        with Locations(Location((0, 30, 0), (0, 0, 270))):
            Circle(SKETCH11_R)
        with Locations(Location((0, 30, 0), (0, 0, 270))):
            Circle(SKETCH11_R_2, mode=Mode.SUBTRACT)
    extrude(amount=BOSS_EXTRUDE5_DEPTH)


with BuildPart() as cut_extrude13_tool:
    # Sketch13 → Cut-Extrude13 (new body)
    with BuildSketch(Plane(origin=(0, 0, 0), x_dir=(1, 0, 0), z_dir=(0, 1, 0))):
        with BuildLine():
            Line((-4, 7.2), (-7.7, 30))
            ThreePointArc((-7.7, 30), (0, 37.7), (7.7, 30))
            Line((7.7, 30), (4, 7.2))
            ThreePointArc((4, 7.2), (0, 3.2), (-4, 7.2))
        make_face()
        with Locations((0, 30)):
            Circle(SKETCH13_R, mode=Mode.SUBTRACT)
        with Locations(Location((0, 17, 0), (0, 0, 270))):
            Circle(SKETCH13_R_2, mode=Mode.SUBTRACT)
        with Locations(Location((0, 8, 0), (0, 0, 270))):
            Circle(SKETCH13_R_2, mode=Mode.SUBTRACT)
    extrude(amount=CUT_EXTRUDE13_DEPTH)


with BuildPart() as part_1:
    add(part.part)

    # Cut-Extrude13: cut by cut_extrude13_tool
    add(cut_extrude13_tool.part, mode=Mode.SUBTRACT)

    # Sketch14 → Boss-Extrude6 (add)
    with BuildSketch(Plane(origin=(0, 7, 0), x_dir=(-1, 0, 0), z_dir=(0, -1, 0)).offset(BOSS_EXTRUDE6_START)):
        with BuildLine():
            Line((-6.401754386, 22), (6.401754386, 22))
            Line((6.401754386, 22), (4, 7.2))
            ThreePointArc((4, 7.2), (0, 3.2), (-4, 7.2))
            Line((-4, 7.2), (-6.401754386, 22))
        make_face()
    extrude(amount=-BOSS_EXTRUDE6_DEPTH)

    # Sketch13<2> → Cut-Extrude14 (cut, up to next)
    with BuildSketch(Plane(origin=(0, 0, 0), x_dir=(1, 0, 0), z_dir=(0, 1, 0)), mode=Mode.PRIVATE) as cut_extrude14_sk1:
        with Locations(Location((0, 17, 0), (0, 0, 90))):
            Circle(SKETCH13_2_R)
    cut_extrude14_tool1 = extrude(cut_extrude14_sk1.sketch, amount=CUT_EXTRUDE14_REACH, mode=Mode.PRIVATE) & part_1.part
    # Sketch13<2> → Cut-Extrude14 (cut, up to next)
    with BuildSketch(Plane(origin=(0, 0, 0), x_dir=(1, 0, 0), z_dir=(0, 1, 0)), mode=Mode.PRIVATE) as cut_extrude14_sk2:
        with Locations(Location((0, 8, 0), (0, 0, 90))):
            Circle(SKETCH13_2_R)
    cut_extrude14_tool2 = extrude(cut_extrude14_sk2.sketch, amount=CUT_EXTRUDE14_REACH, mode=Mode.PRIVATE) & part_1.part
    add(cut_extrude14_tool1.solids().sort_by_distance((0, 0, -17))[0], mode=Mode.SUBTRACT)
    add(cut_extrude14_tool2.solids().sort_by_distance((0, 0, -8))[0], mode=Mode.SUBTRACT)

    # Chamfer8
    chamfer8_edges = [part_1.edges().sort_by_distance(p)[0] for p in [
        (0, 7, -22),
    ]]
    chamfer8_side = [part_1.faces().sort_by_distance(p)[0] for p in [
        (0, 7, -22.21992044),
    ]]
    chamfer(chamfer8_edges, length=CHAMFER8_SIZE, length2=CHAMFER8_SIZE2, reference=chamfer8_side[0])


with BuildPart() as body_2_1:
    add(body_2.part)

    # Cut-Extrude13: cut by cut_extrude13_tool
    add(cut_extrude13_tool.part, mode=Mode.SUBTRACT)


solid = part_1.part
